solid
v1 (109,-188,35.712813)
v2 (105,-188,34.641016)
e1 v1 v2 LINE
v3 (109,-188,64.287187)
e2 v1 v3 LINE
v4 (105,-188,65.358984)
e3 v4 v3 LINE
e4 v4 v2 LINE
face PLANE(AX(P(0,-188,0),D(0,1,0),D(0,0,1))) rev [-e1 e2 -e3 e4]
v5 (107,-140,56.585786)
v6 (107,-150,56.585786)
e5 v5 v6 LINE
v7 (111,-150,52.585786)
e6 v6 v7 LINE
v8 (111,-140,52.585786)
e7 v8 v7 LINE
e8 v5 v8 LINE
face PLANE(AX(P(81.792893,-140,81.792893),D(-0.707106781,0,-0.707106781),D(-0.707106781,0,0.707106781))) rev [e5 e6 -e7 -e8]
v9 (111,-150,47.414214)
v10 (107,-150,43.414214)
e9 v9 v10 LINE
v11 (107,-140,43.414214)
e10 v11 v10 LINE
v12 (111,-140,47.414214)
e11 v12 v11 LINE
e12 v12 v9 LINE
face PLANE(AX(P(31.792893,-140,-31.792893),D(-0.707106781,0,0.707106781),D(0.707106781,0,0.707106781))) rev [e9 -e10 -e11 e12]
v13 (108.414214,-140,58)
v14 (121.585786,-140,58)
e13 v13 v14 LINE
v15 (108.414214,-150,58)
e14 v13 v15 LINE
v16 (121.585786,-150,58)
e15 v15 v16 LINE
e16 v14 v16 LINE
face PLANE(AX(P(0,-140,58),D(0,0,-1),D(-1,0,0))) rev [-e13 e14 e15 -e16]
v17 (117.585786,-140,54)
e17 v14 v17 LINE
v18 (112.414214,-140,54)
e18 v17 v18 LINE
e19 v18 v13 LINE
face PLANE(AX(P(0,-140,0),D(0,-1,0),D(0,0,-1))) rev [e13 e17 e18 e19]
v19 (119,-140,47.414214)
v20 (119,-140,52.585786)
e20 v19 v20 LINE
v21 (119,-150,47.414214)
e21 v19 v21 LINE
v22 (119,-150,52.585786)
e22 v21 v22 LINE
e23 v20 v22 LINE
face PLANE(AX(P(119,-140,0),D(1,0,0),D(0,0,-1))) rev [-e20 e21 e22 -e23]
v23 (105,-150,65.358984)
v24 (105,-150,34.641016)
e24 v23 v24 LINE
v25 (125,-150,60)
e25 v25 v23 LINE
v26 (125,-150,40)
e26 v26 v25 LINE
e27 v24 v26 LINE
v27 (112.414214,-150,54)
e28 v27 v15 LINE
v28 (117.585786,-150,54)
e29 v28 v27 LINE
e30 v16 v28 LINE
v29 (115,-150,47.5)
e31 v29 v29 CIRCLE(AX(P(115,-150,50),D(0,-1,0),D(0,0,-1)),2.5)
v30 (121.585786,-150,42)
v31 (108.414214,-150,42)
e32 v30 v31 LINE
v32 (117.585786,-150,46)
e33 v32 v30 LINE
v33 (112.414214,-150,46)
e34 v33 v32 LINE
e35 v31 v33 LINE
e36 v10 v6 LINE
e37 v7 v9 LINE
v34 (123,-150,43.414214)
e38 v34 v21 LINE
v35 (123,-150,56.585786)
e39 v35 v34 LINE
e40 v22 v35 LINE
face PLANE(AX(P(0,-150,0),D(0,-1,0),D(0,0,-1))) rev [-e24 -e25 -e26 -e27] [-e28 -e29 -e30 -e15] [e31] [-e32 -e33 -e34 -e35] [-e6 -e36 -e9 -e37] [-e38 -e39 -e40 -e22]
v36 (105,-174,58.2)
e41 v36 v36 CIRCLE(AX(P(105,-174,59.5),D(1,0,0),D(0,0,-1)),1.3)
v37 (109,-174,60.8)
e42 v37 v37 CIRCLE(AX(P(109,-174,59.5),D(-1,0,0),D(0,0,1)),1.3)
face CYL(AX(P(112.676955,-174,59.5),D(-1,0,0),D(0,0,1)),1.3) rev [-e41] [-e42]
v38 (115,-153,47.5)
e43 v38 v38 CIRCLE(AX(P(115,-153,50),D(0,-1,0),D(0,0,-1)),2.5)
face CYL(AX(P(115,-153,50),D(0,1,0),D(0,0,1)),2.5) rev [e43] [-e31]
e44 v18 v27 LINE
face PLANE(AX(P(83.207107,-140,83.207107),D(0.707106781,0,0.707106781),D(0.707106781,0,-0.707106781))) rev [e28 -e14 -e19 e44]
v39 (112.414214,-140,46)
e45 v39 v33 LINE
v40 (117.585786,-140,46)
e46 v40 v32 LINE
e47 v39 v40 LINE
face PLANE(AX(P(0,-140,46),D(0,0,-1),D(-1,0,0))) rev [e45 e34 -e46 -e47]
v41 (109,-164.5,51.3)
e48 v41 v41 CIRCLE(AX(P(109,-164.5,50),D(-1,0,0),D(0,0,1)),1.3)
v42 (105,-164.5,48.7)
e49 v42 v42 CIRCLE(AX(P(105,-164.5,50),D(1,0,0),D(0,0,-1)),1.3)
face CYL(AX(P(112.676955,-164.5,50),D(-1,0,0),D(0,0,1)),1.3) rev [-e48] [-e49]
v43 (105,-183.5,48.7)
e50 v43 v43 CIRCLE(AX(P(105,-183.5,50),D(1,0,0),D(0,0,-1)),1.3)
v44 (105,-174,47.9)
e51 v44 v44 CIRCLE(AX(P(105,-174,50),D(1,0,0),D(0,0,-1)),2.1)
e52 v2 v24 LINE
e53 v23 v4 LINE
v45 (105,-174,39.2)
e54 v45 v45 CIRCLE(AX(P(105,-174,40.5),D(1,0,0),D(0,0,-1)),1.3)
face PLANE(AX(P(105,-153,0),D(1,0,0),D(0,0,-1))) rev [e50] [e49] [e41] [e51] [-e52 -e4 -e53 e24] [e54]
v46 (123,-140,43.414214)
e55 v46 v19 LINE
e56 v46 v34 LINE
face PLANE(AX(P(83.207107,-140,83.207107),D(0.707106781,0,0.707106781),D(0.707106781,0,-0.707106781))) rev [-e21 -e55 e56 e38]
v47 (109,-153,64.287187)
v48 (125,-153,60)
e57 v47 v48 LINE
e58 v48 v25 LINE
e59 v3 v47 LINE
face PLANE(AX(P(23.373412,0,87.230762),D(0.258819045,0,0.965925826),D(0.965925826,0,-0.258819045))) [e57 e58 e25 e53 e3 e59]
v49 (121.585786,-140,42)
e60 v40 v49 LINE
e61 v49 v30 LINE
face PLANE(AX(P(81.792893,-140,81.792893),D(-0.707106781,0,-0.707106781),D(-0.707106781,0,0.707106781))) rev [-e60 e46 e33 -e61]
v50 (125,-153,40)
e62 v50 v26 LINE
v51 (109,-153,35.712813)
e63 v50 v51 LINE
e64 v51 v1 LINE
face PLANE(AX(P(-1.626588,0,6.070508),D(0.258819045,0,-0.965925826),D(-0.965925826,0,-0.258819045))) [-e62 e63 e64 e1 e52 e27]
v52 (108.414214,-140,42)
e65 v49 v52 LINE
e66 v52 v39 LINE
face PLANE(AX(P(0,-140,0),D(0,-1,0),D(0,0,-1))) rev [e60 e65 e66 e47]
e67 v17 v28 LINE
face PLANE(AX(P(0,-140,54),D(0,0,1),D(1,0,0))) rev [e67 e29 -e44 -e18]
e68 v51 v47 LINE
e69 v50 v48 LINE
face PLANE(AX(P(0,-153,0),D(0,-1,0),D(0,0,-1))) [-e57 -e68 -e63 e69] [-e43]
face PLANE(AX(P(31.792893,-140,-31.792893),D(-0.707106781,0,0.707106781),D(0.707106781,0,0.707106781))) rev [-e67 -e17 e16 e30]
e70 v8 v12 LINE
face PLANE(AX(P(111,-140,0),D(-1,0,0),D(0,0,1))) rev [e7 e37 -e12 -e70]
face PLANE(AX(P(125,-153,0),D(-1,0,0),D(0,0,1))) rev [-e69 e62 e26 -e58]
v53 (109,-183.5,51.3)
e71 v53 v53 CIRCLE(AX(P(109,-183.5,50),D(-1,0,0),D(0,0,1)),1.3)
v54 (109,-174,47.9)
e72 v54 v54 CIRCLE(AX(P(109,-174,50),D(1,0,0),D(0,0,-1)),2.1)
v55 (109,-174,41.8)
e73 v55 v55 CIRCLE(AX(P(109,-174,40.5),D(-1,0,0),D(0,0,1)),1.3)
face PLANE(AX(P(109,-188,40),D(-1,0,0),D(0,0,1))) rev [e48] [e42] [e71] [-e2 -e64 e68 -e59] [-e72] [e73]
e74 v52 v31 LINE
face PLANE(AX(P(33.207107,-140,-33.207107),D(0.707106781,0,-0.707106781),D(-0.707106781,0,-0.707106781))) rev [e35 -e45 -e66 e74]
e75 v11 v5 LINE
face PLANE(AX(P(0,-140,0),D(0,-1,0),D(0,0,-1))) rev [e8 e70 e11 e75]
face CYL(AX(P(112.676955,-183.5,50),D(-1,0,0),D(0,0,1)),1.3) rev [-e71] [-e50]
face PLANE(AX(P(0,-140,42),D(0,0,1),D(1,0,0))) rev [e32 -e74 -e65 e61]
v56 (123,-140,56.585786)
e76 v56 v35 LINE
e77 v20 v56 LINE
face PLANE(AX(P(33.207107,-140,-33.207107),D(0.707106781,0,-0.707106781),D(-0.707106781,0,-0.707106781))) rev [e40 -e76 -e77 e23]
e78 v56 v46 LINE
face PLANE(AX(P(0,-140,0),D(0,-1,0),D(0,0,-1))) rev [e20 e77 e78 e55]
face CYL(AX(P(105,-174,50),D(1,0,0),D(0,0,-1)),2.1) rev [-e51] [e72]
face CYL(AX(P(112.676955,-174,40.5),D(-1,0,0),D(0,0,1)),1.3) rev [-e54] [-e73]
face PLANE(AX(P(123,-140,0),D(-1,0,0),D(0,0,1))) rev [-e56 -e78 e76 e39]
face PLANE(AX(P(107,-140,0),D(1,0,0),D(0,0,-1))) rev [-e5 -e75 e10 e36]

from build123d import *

# Parameters (mm, degrees)
BOSS_EXTRUDE1_DEPTH   = 10
BOSS_EXTRUDE1_2_DEPTH = 10
BOSS_EXTRUDE1_3_DEPTH = 10
BOSS_EXTRUDE1_4_DEPTH = 10
SKETCH1_3_W           = 20
SKETCH1_3_H           = 20
SKETCH1_3_R           = 2.5
BOSS_EXTRUDE2_DEPTH   = 3
SKETCH3_W             = 4
SKETCH3_H             = 20
BOSS_EXTRUDE3_DEPTH   = 35
BOSS_EXTRUDE4_START   = -188
BOSS_EXTRUDE4_DEPTH   = 38
BOSS_EXTRUDE4_START_2 = -153
BOSS_EXTRUDE4_2_DEPTH = 3
BOSS_EXTRUDE8_START   = -188
BOSS_EXTRUDE8_DEPTH   = 38
BOSS_EXTRUDE8_START_2 = -153
BOSS_EXTRUDE8_2_DEPTH = 3
SKETCH4_R             = 1.3
CUT_EXTRUDE1_DEPTH    = 4
SKETCH5_R             = 2.1
CUT_EXTRUDE2_DEPTH    = 200.679234698


# Read off the part's stored shape, not the designer's step: Boss-Extrude4, Boss-Extrude8
with BuildPart() as part:
    # Sketch1 → Boss-Extrude1 (new body)
    with BuildSketch(Plane.XZ.offset(150)):
        Polygon((111.9, 58), (108.414213562, 58), (112.414213562, 54), (117.585786438, 54), (121.585786438, 58), (118.1, 58), align=None)
    extrude(amount=-BOSS_EXTRUDE1_DEPTH)



with BuildPart() as body_2:
    # Sketch1 → Boss-Extrude1 2 (new body)
    with BuildSketch(Plane.XZ.offset(150)):
        Polygon((111, 47.414213562), (111, 52.585786438), (107, 56.585786438), (107, 53.1), (107, 46.9), (107, 43.414213562), align=None)
    extrude(amount=-BOSS_EXTRUDE1_2_DEPTH)


with BuildPart() as body_3:
    # Sketch1 → Boss-Extrude1 3 (new body)
    with BuildSketch(Plane.XZ.offset(150)):
        Polygon((123, 53.1), (123, 56.585786438), (119, 52.585786438), (119, 47.414213562), (123, 43.414213562), (123, 46.9), align=None)
    extrude(amount=-BOSS_EXTRUDE1_3_DEPTH)


with BuildPart() as body_4:
    # Sketch1 → Boss-Extrude1 4 (new body)
    with BuildSketch(Plane.XZ.offset(150)):
        Polygon((112.414213562, 46), (108.414213562, 42), (111.9, 42), (118.1, 42), (121.585786438, 42), (117.585786438, 46), align=None)
    extrude(amount=-BOSS_EXTRUDE1_4_DEPTH)


with BuildPart() as part_1:
    add(part.part)

    add(body_2.part)  # Boss-Extrude2 merges body 2

    add(body_3.part)  # Boss-Extrude2 merges body 3

    add(body_4.part)  # Boss-Extrude2 merges body 4
    # Sketch1<3> → Boss-Extrude2 (add)
    with BuildSketch(Plane.XZ.offset(150)):
        with Locations((115, 50)):
            Rectangle(SKETCH1_3_W, SKETCH1_3_H)
        with Locations(Location((115, 50, 0), (0, 0, 270))):
            Circle(SKETCH1_3_R, mode=Mode.SUBTRACT)
    extrude(amount=BOSS_EXTRUDE2_DEPTH)

    # Sketch3 → Boss-Extrude3 (add)
    with BuildSketch(Plane.XZ.offset(153)):
        with Locations((107, 50)):
            Rectangle(SKETCH3_W, SKETCH3_H)
    extrude(amount=BOSS_EXTRUDE3_DEPTH)

    # Boss-Extrude4 outline → Boss-Extrude4 (add)
    with BuildSketch(Plane(origin=(0, 0, 0), x_dir=(1, 0, 0), z_dir=(0, 1, 0)).offset(BOSS_EXTRUDE4_START)):
        Polygon((105, -34.641016151), (105, -40), (109, -40), (109, -35.712812921), align=None)
    extrude(amount=BOSS_EXTRUDE4_DEPTH)

    # Boss-Extrude4 2 outline → Boss-Extrude4 2 (add)
    with BuildSketch(Plane(origin=(0, 0, 0), x_dir=(1, 0, 0), z_dir=(0, 1, 0)).offset(BOSS_EXTRUDE4_START_2)):
        Polygon((109, -35.712812921), (109, -40), (125, -40), align=None)
    extrude(amount=BOSS_EXTRUDE4_2_DEPTH)

    # Boss-Extrude8 outline → Boss-Extrude8 (add)
    with BuildSketch(Plane(origin=(0, 0, 0), x_dir=(1, 0, 0), z_dir=(0, 1, 0)).offset(BOSS_EXTRUDE8_START)):
        Polygon((105, -60), (105, -65.358983849), (109, -64.287187079), (109, -60), align=None)
    extrude(amount=BOSS_EXTRUDE8_DEPTH)

    # Boss-Extrude8 2 outline → Boss-Extrude8 2 (add)
    with BuildSketch(Plane(origin=(0, 0, 0), x_dir=(1, 0, 0), z_dir=(0, 1, 0)).offset(BOSS_EXTRUDE8_START_2)):
        Polygon((109, -60), (109, -64.287187079), (125, -60), align=None)
    extrude(amount=BOSS_EXTRUDE8_2_DEPTH)

    # Sketch4 → Cut-Extrude1 (cut)
    with BuildSketch(Plane(origin=(105, 0, -65), x_dir=(0, 0, -1), z_dir=(1, 0, 0))):
        with Locations(Location((-115, -164.5, 0), (0, 0, 180))):
            Circle(SKETCH4_R)
        with Locations(Location((-105.5, -174, 0), (0, 0, 180))):
            Circle(SKETCH4_R)
        with Locations(Location((-115, -183.5, 0), (0, 0, 180))):
            Circle(SKETCH4_R)
        with Locations(Location((-124.5, -174, 0), (0, 0, 180))):
            Circle(SKETCH4_R)
    extrude(amount=CUT_EXTRUDE1_DEPTH, mode=Mode.SUBTRACT)

    # Sketch5 → Cut-Extrude2 (cut, through all)
    with BuildSketch(Plane(origin=(109, 0, 0), x_dir=(0, 0, -1), z_dir=(1, 0, 0))):
        with Locations((-50, -174)):
            Circle(SKETCH5_R)
    extrude(amount=-CUT_EXTRUDE2_DEPTH, mode=Mode.SUBTRACT)


solid = part_1.part
